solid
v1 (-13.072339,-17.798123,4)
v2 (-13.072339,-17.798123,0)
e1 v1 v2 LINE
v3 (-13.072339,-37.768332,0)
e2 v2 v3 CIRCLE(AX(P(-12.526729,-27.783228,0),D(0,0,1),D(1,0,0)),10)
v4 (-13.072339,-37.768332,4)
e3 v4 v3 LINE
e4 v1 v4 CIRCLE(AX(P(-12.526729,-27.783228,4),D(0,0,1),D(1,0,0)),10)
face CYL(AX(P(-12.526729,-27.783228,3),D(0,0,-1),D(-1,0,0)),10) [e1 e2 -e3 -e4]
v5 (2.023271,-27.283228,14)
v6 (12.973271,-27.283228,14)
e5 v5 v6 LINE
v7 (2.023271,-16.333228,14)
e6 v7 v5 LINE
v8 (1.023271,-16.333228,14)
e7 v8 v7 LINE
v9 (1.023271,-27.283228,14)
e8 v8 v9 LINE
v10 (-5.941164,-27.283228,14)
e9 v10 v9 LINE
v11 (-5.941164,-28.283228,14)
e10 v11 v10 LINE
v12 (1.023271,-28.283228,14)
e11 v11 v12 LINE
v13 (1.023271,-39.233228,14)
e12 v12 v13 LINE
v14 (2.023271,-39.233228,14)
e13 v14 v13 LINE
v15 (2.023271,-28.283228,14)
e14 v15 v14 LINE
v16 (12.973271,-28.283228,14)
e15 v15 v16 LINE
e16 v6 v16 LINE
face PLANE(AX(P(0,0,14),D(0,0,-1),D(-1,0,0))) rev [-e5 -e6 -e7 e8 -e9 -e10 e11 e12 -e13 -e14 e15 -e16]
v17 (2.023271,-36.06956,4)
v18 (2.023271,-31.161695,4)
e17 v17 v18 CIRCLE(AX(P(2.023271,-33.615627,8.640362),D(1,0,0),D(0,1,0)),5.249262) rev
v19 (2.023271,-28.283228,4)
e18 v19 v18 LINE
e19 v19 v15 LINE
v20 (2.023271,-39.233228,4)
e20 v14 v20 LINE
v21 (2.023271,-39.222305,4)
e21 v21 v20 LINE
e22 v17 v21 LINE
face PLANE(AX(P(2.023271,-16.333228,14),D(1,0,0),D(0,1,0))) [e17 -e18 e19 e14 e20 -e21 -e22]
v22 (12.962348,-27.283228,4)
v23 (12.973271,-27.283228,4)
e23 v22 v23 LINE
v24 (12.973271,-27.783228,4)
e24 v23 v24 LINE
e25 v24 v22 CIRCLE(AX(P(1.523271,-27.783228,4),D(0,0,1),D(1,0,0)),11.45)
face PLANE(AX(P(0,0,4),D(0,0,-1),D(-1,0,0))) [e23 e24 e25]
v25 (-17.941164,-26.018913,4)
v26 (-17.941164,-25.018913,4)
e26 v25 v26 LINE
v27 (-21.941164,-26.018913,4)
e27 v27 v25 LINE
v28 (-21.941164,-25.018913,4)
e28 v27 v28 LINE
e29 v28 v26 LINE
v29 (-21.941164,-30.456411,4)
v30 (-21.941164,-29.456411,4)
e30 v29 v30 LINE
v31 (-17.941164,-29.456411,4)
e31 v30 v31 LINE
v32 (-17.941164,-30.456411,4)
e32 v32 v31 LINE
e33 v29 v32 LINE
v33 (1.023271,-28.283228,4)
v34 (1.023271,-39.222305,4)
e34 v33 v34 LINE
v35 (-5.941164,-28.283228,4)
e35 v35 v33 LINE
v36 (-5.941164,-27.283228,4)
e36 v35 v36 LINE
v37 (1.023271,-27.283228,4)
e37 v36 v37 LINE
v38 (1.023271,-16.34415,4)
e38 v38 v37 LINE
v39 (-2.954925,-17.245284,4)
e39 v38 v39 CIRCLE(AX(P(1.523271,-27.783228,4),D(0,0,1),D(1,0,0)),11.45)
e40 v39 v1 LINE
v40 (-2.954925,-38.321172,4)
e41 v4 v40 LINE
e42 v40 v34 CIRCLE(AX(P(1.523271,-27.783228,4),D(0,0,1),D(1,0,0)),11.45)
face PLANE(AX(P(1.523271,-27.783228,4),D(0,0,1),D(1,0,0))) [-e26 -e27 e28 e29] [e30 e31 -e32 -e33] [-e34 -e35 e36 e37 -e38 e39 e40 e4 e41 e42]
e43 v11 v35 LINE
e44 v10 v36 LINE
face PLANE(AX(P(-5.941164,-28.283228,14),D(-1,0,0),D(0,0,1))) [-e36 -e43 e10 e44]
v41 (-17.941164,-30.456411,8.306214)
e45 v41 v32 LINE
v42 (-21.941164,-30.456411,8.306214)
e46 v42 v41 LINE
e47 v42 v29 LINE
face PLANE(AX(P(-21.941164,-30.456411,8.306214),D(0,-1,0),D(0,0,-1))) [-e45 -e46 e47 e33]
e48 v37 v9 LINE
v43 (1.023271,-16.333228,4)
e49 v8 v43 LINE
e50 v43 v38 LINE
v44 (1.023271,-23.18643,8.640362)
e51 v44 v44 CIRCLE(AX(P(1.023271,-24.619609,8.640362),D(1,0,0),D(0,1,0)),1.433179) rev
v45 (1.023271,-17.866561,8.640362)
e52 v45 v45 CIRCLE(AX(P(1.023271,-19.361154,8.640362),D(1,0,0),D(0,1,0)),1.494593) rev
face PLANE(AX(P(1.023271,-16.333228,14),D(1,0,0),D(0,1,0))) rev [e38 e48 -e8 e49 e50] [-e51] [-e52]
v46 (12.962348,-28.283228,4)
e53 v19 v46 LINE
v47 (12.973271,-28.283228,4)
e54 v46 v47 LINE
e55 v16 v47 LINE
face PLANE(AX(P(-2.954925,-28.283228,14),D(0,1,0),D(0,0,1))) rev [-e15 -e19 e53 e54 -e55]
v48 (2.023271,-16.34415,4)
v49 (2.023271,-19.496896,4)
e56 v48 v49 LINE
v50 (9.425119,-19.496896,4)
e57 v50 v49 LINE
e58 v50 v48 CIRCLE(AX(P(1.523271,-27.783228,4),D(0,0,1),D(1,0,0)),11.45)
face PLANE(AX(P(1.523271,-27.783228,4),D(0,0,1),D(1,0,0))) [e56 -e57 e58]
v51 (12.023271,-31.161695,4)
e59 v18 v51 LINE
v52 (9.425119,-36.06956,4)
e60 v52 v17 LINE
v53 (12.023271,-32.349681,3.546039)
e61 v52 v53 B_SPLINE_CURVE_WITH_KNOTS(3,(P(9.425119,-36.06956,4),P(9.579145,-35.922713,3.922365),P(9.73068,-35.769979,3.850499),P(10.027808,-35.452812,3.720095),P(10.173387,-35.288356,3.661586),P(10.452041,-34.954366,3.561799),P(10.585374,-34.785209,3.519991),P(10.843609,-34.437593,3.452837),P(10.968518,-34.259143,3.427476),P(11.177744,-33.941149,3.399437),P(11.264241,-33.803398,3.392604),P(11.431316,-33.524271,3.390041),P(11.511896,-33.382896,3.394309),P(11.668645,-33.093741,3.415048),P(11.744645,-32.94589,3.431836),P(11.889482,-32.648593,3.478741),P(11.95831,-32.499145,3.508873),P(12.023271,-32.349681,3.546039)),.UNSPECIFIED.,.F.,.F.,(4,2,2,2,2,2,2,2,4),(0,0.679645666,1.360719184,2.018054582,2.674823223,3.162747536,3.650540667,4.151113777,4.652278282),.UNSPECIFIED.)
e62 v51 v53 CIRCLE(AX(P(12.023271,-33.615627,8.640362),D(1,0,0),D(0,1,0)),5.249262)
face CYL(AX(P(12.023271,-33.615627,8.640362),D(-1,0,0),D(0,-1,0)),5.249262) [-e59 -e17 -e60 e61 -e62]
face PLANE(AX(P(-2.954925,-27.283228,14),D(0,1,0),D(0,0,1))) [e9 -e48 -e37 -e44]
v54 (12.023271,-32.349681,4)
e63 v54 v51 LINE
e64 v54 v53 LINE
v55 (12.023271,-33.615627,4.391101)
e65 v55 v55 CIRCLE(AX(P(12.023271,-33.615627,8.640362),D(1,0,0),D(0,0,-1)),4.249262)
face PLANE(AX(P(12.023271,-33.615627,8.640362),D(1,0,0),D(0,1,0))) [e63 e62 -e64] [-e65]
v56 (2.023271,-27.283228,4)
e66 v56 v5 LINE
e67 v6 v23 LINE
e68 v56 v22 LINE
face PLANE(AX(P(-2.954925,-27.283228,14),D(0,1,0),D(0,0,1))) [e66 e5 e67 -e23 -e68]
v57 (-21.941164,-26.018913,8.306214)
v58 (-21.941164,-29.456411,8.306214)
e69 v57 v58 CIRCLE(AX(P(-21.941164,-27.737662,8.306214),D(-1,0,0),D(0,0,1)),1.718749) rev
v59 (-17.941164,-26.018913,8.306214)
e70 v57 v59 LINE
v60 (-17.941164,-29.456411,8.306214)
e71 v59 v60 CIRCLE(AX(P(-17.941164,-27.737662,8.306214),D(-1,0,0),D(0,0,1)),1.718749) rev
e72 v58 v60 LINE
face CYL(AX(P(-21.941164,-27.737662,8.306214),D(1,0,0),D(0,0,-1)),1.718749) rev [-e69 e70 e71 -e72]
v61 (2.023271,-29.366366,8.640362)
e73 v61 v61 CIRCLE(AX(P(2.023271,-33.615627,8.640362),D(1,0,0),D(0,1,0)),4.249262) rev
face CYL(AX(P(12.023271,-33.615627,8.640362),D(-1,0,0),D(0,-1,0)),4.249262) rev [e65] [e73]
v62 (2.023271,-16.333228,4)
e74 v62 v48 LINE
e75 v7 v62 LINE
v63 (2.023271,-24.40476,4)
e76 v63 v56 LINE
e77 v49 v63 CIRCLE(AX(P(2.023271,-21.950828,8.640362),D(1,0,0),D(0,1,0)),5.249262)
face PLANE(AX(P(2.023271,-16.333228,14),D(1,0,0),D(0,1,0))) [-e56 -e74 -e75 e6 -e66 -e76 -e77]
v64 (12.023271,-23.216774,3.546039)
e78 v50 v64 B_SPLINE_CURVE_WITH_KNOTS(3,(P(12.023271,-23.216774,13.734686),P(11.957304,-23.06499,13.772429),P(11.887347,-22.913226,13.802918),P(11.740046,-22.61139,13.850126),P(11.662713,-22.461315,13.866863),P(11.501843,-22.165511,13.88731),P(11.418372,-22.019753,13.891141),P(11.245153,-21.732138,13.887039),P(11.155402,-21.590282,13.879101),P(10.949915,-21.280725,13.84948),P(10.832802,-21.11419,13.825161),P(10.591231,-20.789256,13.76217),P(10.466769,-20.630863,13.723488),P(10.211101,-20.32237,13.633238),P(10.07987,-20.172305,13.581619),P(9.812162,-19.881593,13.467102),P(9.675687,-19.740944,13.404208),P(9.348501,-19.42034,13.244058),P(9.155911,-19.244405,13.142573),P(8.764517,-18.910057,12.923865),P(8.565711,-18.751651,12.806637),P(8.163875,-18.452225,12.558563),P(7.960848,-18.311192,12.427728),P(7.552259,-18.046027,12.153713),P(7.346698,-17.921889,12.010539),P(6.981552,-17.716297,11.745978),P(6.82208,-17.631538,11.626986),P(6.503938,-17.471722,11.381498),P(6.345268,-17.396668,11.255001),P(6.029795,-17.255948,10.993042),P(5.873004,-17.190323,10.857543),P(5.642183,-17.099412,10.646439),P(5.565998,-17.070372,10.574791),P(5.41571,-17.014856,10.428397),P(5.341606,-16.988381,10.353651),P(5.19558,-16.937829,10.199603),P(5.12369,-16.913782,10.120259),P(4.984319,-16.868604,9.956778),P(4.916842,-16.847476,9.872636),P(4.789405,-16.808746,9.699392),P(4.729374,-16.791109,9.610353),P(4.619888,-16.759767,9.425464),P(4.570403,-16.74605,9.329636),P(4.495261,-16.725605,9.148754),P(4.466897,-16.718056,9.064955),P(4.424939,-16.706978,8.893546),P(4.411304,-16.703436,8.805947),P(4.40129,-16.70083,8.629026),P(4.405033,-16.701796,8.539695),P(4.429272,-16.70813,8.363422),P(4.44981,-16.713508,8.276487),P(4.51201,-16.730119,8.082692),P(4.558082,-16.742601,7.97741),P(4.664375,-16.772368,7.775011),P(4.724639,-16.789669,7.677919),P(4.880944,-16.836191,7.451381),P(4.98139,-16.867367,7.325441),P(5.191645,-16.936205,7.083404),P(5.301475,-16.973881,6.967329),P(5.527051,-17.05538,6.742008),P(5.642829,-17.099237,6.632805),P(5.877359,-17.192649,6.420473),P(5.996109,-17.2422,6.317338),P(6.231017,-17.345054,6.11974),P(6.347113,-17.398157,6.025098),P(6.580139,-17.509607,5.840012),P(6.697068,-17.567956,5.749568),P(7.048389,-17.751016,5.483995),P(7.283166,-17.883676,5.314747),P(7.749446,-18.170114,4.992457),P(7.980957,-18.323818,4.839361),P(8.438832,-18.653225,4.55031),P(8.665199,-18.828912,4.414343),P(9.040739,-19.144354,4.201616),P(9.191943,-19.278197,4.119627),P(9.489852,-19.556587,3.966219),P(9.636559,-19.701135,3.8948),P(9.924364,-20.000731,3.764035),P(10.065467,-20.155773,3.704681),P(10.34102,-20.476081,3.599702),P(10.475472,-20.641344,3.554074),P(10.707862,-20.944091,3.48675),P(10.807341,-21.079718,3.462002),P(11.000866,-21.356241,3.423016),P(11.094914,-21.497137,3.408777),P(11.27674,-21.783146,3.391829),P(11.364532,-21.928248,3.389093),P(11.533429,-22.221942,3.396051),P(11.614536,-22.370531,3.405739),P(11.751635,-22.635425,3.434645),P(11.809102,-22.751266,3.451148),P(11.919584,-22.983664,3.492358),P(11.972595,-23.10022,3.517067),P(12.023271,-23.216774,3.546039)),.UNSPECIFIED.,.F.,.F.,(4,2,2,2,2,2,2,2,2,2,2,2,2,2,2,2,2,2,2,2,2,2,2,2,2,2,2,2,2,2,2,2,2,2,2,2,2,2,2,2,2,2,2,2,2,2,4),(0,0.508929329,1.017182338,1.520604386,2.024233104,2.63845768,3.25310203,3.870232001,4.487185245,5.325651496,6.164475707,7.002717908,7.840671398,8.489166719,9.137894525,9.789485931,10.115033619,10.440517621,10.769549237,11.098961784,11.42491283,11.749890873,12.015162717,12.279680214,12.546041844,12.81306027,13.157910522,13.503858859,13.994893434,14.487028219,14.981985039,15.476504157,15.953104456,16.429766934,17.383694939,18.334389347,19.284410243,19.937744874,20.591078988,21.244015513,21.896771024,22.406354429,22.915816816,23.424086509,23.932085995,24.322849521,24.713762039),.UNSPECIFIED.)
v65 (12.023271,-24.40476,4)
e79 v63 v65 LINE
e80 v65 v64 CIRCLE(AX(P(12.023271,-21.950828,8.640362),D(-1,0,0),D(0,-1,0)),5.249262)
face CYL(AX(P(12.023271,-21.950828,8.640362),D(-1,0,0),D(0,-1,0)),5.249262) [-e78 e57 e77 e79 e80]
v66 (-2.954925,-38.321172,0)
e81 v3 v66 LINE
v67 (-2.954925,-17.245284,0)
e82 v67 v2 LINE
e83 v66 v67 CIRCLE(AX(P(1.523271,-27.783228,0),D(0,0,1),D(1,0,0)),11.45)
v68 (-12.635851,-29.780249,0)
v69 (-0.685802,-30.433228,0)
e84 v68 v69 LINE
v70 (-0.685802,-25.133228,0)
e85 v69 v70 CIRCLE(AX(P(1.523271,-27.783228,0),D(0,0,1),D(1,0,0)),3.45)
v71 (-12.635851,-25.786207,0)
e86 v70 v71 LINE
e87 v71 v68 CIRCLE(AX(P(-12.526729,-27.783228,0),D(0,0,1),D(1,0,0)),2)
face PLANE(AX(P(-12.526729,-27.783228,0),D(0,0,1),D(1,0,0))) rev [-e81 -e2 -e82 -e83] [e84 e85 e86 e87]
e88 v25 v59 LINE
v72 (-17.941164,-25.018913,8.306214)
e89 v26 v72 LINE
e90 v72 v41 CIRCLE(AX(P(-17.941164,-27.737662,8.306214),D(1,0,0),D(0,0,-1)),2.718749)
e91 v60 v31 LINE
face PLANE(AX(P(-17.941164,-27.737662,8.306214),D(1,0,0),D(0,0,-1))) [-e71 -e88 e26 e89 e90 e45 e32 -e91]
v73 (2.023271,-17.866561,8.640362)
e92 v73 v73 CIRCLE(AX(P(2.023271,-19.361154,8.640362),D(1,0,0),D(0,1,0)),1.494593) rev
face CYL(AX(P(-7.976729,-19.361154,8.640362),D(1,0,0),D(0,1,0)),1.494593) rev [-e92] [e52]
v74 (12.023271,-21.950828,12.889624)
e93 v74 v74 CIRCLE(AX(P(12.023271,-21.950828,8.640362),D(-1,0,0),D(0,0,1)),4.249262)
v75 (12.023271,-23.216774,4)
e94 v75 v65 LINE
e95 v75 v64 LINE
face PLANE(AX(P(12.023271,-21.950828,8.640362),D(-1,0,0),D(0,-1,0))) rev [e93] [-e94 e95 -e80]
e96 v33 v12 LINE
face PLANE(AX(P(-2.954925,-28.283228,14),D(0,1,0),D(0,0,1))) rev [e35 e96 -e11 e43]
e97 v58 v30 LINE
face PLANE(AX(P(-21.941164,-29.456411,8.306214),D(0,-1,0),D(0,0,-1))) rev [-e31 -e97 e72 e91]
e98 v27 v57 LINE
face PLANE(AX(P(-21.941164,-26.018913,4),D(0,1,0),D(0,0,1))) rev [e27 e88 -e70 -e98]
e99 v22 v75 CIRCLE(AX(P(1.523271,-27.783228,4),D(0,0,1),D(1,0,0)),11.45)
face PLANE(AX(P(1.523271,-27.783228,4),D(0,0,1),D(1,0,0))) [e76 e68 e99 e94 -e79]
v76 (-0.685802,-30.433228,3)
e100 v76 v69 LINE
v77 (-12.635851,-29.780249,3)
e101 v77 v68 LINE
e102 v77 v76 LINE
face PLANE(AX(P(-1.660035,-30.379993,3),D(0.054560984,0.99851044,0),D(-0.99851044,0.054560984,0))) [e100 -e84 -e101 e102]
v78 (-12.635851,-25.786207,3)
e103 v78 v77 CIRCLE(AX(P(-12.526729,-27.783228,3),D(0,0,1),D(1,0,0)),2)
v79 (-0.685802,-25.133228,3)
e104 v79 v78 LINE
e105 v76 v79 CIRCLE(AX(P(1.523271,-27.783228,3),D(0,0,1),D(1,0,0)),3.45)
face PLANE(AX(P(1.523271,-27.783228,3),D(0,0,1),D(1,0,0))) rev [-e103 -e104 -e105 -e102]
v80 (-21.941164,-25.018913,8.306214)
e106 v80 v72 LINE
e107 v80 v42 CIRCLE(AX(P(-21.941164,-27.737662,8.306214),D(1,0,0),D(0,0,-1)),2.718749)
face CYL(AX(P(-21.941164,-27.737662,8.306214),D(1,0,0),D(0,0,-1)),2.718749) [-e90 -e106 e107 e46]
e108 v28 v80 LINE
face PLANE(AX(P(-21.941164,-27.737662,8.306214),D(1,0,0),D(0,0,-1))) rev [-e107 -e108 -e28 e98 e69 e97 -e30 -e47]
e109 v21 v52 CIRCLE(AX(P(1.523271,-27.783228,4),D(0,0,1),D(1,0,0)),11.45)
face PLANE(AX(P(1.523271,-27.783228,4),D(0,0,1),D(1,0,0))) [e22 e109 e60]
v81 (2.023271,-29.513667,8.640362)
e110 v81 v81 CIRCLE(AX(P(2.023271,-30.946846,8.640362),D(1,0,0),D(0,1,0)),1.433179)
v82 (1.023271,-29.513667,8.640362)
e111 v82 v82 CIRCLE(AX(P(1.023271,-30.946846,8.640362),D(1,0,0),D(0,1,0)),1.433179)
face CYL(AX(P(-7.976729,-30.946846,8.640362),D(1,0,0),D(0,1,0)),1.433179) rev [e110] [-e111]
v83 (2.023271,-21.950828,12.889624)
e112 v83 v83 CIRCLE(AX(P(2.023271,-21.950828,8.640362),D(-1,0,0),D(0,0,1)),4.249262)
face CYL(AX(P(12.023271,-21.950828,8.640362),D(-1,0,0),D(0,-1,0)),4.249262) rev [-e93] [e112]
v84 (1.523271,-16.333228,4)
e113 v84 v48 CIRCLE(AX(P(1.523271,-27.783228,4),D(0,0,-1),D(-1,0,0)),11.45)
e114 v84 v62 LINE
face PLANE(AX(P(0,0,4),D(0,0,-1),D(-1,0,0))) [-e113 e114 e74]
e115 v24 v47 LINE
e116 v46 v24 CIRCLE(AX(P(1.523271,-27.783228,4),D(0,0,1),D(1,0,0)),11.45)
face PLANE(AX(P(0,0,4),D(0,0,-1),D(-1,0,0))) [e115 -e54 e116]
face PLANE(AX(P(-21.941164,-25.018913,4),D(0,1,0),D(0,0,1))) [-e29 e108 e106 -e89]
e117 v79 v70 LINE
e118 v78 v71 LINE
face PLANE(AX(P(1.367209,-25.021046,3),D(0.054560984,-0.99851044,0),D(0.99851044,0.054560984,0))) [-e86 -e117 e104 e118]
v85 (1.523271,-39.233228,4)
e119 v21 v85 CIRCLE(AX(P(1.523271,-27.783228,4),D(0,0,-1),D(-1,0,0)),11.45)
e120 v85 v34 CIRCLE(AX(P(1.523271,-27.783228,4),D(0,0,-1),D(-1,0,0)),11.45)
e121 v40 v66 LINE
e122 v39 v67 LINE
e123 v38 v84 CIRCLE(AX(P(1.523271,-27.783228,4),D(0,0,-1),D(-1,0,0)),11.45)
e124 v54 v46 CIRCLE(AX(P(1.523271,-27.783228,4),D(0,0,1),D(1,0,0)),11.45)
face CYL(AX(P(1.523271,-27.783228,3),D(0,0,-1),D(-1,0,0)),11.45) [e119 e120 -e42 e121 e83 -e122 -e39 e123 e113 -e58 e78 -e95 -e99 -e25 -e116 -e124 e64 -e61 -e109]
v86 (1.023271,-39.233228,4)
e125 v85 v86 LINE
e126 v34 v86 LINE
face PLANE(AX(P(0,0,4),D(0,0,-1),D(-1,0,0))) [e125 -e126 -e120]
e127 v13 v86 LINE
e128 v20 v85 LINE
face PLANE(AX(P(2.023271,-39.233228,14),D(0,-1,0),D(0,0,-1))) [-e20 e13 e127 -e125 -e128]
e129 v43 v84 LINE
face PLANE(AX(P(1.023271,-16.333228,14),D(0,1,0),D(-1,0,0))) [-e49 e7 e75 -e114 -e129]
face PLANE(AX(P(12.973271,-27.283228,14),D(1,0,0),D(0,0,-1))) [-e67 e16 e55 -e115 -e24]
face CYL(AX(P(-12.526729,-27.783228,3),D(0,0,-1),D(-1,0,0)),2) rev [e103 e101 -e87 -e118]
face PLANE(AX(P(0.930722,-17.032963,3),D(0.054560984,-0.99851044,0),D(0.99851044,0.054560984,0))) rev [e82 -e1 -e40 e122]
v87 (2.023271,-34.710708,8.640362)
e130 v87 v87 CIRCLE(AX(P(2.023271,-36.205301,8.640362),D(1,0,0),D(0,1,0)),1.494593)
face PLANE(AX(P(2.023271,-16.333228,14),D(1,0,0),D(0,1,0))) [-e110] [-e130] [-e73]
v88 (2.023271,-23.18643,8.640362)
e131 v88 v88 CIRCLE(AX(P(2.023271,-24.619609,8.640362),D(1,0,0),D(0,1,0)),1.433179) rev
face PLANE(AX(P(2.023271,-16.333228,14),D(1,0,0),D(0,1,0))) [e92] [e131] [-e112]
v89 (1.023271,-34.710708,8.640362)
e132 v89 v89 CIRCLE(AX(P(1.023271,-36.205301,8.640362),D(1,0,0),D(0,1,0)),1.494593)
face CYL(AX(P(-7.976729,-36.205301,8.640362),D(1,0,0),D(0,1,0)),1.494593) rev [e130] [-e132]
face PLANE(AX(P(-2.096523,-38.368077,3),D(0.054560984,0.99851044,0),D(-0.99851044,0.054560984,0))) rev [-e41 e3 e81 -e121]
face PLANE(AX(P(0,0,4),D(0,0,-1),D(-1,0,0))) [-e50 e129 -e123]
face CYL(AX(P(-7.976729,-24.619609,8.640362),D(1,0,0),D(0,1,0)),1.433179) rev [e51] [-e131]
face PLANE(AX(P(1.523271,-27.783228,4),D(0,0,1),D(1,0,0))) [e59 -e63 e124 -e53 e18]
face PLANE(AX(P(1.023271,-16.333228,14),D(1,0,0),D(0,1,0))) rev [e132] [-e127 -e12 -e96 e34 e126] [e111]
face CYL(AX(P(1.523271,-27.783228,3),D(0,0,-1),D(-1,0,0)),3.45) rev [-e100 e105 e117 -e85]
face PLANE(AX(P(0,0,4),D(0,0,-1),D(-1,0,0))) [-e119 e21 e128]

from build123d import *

# Parameters (mm, degrees)
EXTRUDE_THIN1_DEPTH     = 3
BOSS_EXTRUDE1_DEPTH     = 1
EXTRUDE_THIN2_OUTLINE_W = 18.914434681
EXTRUDE_THIN2_OUTLINE_H = 1
EXTRUDE_THIN2_DEPTH     = 10
SKETCH4_4_W             = 1
SKETCH4_4_H             = 22.9
EXTRUDE_THIN3_DEPTH     = 10
SKETCH5_R               = 5.249261594
SKETCH5_R_2             = 4.249261594
EXTRUDE_THIN4_DEPTH     = 10
SKETCH5_4_R             = 1.494593426
SKETCH5_4_R_2           = 1.433178879
CUT_EXTRUDE1_DEPTH      = 10
EXTRUDE_THIN5_START     = 12
EXTRUDE_THIN5_DEPTH     = 4


# Read off the part's stored shape, not the designer's step: Extrude-Thin1, Extrude-Thin2
with BuildPart() as part:
    # Extrude-Thin1 outline → Extrude-Thin1 (new body)
    with BuildSketch(Plane.XY):
        with BuildLine():
            Line((-2.95492513, -17.245283727), (-13.072339205, -17.798123277))
            ThreePointArc((-13.072339205, -17.798123277), (-22.52672937, -27.783227678), (-13.072339205, -37.76833208))
            Line((-13.072339205, -37.76833208), (-2.95492513, -38.32117163))
            ThreePointArc((-2.95492513, -38.32117163), (12.97327063, -27.783227679), (-2.95492513, -17.245283727))
        make_face()
        with BuildLine():
            ThreePointArc((-12.635851337, -29.780248558), (-14.52672937, -27.783227678), (-12.635851337, -25.786206798))
            Line((-12.635851337, -25.786206798), (-0.685801573, -25.133227678))
            ThreePointArc((-0.685801573, -25.133227678), (4.97327063, -27.783227678), (-0.685801573, -30.433227678))
            Line((-0.685801573, -30.433227678), (-12.635851337, -29.780248558))
        make_face(mode=Mode.SUBTRACT)
    extrude(amount=EXTRUDE_THIN1_DEPTH)

    # Sketch3 → Boss-Extrude1 (add)
    with BuildSketch(Plane.XY.offset(3)):
        with BuildLine():
            Line((-2.95492513, -17.245283727), (-13.072339205, -17.798123277))
            ThreePointArc((-13.072339205, -17.798123277), (-22.52672937, -27.783227678), (-13.072339205, -37.76833208))
            Line((-13.072339205, -37.76833208), (-2.95492513, -38.32117163))
            ThreePointArc((-2.95492513, -38.32117163), (12.97327063, -27.783227678), (-2.95492513, -17.245283727))
        make_face()
    extrude(amount=BOSS_EXTRUDE1_DEPTH)

    # Extrude-Thin2 outline → Extrude-Thin2 (add)
    with BuildSketch(Plane.XY.offset(4)):
        with Locations((3.516053289, -27.783227678)):
            Rectangle(EXTRUDE_THIN2_OUTLINE_W, EXTRUDE_THIN2_OUTLINE_H)
    extrude(amount=EXTRUDE_THIN2_DEPTH)

    # Sketch4<4> → Extrude-Thin3 (add)
    with BuildSketch(Plane.XY.offset(4)):
        with Locations((1.52327063, -27.783227678)):
            Rectangle(SKETCH4_4_W, SKETCH4_4_H)
        Polygon((12.97327063, -27.283227678), (-2.95492513, -27.283227678), (-5.941164051, -27.283227678), (-5.941164051, -28.283227678), (-2.95492513, -28.283227678), (12.97327063, -28.283227678), align=None)
    extrude(amount=EXTRUDE_THIN3_DEPTH)

    # Sketch5 → Extrude-Thin4 (add)
    # profile 1 of 2: a face of its own
    with BuildSketch(Plane(origin=(2.02327063, 0, 0), x_dir=(0, 0, -1), z_dir=(1, 0, 0))):
        with Locations((-8.640362386, -33.615627273)):
            Circle(SKETCH5_R)
        with Locations((-8.640362386, -33.615627273)):
            Circle(SKETCH5_R_2, mode=Mode.SUBTRACT)
    # profile 2 of 2: a face of its own
    with BuildSketch(Plane(origin=(2.02327063, 0, 0), x_dir=(0, 0, -1), z_dir=(1, 0, 0))):
        with Locations((-8.640362386, -21.950828084)):
            Circle(SKETCH5_R)
        with Locations((-8.640362386, -21.950828084)):
            Circle(SKETCH5_R_2, mode=Mode.SUBTRACT)
    extrude(amount=EXTRUDE_THIN4_DEPTH)

    # Sketch5<4> → Cut-Extrude1 (cut)
    with BuildSketch(Plane(origin=(2.02327063, 0, 0), x_dir=(0, 0, -1), z_dir=(1, 0, 0))):
        with Locations(Location((-8.640362386, -36.205301228, 0), (0, 0, 90))):
            Circle(SKETCH5_4_R)
        with Locations(Location((-8.640362386, -30.946846255, 0), (0, 0, 90))):
            Circle(SKETCH5_4_R_2)
        with Locations(Location((-8.640362386, -24.619609101, 0), (0, 0, 90))):
            Circle(SKETCH5_4_R_2)
        with Locations(Location((-8.640362386, -19.361154128, 0), (0, 0, 90))):
            Circle(SKETCH5_4_R)
    extrude(amount=-CUT_EXTRUDE1_DEPTH, mode=Mode.SUBTRACT)

    # Sketch6 → Extrude-Thin5 (add)
    with BuildSketch(Plane.ZY.offset(5.941164051).offset(EXTRUDE_THIN5_START)):
        with BuildLine():
            Line((4, -25.018913287), (8.306214493, -25.018913287))
            ThreePointArc((8.306214493, -25.018913287), (11.024963262, -27.737662056), (8.306214493, -30.456410826))
            Line((8.306214493, -30.456410826), (4, -30.456410826))
            Line((4, -30.456410826), (4, -29.456410826))
            Line((4, -29.456410826), (8.306214493, -29.456410826))
            ThreePointArc((8.306214493, -29.456410826), (10.024963262, -27.737662056), (8.306214493, -26.018913287))
            Line((8.306214493, -26.018913287), (4, -26.018913287))
            Line((4, -26.018913287), (4, -25.018913287))
        make_face()
    extrude(amount=EXTRUDE_THIN5_DEPTH)


solid = part.part
